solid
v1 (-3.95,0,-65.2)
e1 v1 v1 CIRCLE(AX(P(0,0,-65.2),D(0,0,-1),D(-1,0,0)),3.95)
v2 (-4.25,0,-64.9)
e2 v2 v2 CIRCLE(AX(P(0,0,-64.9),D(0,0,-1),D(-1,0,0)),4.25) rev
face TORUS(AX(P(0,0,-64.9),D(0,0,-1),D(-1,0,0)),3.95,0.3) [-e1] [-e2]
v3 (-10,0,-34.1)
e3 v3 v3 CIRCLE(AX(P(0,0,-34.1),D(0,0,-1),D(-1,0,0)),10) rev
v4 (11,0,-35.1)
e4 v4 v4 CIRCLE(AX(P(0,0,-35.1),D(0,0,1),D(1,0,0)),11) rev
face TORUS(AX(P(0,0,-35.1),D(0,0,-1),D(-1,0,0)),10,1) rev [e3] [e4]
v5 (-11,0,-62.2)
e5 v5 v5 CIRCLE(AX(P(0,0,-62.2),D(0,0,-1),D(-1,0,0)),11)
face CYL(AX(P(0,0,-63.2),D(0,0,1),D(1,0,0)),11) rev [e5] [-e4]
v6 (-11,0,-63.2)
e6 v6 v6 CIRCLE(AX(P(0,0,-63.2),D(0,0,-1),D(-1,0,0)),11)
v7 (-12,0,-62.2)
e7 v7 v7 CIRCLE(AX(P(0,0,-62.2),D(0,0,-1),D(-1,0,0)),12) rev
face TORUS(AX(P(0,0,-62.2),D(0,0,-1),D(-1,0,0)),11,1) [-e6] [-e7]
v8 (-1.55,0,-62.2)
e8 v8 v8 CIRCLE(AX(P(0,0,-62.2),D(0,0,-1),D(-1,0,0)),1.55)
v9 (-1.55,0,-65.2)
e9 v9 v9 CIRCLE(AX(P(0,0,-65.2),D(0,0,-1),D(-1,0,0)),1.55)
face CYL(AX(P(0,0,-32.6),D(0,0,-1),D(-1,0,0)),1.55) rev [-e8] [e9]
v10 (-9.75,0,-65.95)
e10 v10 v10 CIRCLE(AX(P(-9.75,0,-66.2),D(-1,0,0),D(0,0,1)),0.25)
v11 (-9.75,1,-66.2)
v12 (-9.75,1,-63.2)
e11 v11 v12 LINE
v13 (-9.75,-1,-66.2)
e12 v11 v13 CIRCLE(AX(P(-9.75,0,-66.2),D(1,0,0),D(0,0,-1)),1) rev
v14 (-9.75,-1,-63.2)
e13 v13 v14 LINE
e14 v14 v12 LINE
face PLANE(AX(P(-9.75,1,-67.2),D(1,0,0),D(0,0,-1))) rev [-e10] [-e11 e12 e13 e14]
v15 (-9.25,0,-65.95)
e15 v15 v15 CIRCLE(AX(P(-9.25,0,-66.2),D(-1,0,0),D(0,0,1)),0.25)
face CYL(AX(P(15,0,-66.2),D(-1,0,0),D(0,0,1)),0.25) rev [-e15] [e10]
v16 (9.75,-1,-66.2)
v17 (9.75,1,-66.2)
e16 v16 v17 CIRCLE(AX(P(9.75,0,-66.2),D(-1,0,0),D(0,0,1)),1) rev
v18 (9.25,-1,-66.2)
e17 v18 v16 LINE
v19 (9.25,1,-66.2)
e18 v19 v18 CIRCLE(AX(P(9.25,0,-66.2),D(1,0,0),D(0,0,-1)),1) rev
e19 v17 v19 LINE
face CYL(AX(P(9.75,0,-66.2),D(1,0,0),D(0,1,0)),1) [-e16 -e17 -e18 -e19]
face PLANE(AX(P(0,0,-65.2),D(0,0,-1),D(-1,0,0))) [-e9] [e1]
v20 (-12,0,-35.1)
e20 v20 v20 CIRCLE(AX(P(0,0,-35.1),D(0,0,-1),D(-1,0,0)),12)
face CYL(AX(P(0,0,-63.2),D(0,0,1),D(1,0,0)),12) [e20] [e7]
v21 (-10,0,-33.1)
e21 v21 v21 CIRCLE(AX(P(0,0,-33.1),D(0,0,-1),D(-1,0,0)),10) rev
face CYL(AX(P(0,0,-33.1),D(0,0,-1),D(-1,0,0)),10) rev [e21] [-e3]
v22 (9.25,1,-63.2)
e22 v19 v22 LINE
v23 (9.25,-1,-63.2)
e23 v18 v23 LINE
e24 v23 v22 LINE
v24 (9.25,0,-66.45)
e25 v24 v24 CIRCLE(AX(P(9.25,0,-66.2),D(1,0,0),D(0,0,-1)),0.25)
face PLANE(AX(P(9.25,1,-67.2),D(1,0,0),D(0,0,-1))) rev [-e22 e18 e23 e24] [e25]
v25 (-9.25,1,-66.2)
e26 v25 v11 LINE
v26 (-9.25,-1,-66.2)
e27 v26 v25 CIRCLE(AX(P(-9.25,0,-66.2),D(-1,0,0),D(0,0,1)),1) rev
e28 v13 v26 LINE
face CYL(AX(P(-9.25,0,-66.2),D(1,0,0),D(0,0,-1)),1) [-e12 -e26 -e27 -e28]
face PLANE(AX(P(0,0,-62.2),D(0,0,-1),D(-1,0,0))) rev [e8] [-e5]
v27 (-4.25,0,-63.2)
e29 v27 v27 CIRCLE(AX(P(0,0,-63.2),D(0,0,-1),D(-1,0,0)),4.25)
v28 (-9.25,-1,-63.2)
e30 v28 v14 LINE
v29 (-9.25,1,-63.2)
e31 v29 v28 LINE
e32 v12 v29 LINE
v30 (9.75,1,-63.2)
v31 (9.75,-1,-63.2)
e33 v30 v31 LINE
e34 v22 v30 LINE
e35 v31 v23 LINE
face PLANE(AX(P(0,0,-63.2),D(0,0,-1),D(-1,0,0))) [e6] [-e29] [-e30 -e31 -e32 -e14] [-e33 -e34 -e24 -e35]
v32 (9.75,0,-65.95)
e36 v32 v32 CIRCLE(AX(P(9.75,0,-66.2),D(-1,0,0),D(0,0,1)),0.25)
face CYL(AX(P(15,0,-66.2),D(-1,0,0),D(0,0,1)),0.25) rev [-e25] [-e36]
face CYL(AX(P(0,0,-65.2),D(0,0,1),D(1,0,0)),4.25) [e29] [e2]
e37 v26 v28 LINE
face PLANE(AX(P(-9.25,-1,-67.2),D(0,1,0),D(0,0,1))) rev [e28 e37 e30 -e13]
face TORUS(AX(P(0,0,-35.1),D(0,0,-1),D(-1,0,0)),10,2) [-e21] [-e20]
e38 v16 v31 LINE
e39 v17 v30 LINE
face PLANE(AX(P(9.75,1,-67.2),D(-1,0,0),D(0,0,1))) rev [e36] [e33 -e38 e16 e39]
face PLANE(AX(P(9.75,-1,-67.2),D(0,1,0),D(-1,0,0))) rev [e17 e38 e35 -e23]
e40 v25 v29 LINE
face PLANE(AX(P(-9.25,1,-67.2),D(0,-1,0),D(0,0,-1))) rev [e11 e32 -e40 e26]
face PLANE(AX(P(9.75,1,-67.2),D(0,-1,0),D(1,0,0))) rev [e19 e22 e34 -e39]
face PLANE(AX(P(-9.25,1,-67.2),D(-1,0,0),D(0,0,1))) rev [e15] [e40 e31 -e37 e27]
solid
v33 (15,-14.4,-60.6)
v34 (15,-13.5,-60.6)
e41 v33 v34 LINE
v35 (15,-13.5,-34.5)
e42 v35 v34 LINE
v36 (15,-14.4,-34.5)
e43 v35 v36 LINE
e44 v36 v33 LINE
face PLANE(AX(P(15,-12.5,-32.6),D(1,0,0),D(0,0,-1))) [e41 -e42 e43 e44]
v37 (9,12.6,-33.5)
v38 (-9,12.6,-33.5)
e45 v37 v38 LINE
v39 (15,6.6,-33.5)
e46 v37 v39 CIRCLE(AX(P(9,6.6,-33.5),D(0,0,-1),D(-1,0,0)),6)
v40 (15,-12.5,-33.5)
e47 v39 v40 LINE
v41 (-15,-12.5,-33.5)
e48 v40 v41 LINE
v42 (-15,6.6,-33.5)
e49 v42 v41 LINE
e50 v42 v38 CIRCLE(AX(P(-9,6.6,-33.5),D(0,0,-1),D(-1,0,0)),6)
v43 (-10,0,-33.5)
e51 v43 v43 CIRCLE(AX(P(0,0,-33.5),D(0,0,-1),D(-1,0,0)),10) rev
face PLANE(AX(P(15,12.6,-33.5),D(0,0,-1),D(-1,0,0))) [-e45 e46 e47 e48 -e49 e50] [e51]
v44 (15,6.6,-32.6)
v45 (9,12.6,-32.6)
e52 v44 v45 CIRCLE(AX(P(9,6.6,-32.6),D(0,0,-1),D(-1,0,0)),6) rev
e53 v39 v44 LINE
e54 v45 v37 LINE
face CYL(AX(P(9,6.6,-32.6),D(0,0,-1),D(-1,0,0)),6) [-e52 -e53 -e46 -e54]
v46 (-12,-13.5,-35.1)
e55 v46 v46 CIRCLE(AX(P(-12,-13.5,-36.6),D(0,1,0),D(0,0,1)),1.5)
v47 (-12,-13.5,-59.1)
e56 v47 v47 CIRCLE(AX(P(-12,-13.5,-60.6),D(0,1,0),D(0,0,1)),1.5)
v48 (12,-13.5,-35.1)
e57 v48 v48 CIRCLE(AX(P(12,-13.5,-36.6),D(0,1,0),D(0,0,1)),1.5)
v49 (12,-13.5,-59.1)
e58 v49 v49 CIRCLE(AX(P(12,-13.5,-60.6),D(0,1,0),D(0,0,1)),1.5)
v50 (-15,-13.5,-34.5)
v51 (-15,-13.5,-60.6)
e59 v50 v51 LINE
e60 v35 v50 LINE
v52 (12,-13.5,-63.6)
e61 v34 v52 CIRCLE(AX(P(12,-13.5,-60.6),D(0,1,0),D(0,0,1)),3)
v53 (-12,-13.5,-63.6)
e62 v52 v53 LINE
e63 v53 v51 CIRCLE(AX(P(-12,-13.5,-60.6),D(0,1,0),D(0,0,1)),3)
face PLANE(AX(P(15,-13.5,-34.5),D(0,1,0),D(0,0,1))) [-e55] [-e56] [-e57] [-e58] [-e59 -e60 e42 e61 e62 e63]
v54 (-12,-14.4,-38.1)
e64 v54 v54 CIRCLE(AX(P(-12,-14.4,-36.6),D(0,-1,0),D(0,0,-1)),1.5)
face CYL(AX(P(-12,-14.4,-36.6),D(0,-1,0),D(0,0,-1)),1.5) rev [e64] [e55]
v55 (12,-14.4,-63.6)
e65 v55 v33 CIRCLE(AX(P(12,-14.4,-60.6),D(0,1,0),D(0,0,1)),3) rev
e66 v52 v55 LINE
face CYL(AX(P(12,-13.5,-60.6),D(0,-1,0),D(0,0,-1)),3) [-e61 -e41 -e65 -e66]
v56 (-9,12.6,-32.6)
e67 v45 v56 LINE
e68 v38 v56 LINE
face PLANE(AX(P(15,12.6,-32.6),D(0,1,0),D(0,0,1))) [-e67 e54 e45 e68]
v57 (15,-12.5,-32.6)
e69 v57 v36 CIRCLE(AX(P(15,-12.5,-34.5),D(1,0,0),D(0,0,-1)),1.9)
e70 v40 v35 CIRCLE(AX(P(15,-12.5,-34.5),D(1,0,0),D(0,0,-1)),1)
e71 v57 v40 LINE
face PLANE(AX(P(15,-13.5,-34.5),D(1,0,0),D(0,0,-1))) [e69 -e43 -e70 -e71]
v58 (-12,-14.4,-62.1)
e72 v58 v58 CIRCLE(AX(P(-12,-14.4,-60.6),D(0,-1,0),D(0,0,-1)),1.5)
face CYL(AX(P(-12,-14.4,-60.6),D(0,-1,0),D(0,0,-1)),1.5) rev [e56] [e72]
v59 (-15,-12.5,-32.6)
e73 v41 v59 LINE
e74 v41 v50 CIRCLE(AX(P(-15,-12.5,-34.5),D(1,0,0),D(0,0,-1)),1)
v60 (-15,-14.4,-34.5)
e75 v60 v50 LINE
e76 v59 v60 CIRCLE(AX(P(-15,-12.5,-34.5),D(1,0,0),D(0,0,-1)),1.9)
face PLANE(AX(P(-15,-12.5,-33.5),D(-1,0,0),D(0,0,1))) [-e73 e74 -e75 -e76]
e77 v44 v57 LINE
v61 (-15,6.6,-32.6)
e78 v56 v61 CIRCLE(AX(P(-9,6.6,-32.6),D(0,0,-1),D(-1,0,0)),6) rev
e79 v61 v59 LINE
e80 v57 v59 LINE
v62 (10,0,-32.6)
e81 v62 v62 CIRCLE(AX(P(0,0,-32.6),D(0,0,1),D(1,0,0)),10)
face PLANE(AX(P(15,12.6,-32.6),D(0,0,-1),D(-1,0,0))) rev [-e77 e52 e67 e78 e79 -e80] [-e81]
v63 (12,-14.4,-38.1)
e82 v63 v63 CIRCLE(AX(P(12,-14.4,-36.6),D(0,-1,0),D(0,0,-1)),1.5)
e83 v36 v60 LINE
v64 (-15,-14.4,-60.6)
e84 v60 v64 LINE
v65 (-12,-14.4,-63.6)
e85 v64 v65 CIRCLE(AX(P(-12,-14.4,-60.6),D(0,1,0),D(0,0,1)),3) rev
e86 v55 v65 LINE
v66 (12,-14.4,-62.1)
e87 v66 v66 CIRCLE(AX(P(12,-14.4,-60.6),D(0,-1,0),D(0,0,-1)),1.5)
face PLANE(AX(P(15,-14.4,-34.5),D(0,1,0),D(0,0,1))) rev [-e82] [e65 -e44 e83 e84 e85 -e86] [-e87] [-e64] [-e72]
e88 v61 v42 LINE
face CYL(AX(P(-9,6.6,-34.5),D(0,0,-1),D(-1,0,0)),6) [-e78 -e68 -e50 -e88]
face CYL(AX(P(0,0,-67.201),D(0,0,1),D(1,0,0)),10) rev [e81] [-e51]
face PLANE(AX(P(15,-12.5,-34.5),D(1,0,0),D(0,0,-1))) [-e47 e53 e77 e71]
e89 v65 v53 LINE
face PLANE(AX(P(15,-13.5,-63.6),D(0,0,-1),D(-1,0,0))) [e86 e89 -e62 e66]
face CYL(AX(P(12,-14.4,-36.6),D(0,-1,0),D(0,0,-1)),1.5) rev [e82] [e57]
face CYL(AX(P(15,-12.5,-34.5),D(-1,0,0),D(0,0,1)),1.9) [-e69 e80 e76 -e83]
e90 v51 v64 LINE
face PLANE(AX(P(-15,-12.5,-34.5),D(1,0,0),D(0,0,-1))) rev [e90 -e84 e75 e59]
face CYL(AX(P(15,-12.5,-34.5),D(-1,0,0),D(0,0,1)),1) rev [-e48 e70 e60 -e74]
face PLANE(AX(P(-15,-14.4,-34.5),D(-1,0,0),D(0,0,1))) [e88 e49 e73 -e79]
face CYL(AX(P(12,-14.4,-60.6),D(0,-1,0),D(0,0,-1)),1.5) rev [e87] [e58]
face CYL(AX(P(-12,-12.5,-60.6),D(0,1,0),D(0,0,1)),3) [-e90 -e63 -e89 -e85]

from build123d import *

# Parameters (mm, degrees)
SKETCH6_R                         = 12
EXTRUDE5_DEPTH                    = 30.1
FILLET1_R                         = 2
FILLET3_R                         = 1
BASE_FLANGE2_DEPTH                = 15
SKETCH10_R                        = 4.25
EXTRUDE8_DEPTH                    = 2
FILLET4_R                         = 0.3
SKETCH15_W                        = 1.5
SKETCH15_H                        = 0.9
F_3_0_3_DIAMETER_HOLE1_AT_2_COUNT = 2
F_3_0_3_DIAMETER_HOLE1_AT_2_PITCH = 33.941125497
F_3_0_3_DIAMETER_HOLE1_AT_3_COUNT = 2
F_3_0_3_DIAMETER_HOLE1_AT_3_PITCH = 24
F_3_0_3_DIAMETER_HOLE1_AT_4_COUNT = 2
F_3_0_3_DIAMETER_HOLE1_AT_4_PITCH = 24
FILLET6_R                         = 6
FILLET7_R                         = 3
SKETCH16_W                        = 0.5
SKETCH16_H                        = 2
EXTRUDE10_DEPTH                   = 4
FILLET8_RADIUS                    = 1
FILLET8_LENGTH                    = 0.5
FILLET9_RADIUS                    = 1
FILLET9_LENGTH                    = 0.5
SKETCH17_R                        = 0.25
EXTRUDE11_DEPTH                   = 74.046303808
SKETCH19_R                        = 1.55
EXTRUDE13_DEPTH                   = 39.666781609
SKETCH21_R                        = 10
EXTRUDE14_DEPTH                   = 0.9


# Read off the part's stored shape, not the designer's step: Shell4
# Sheet-metal steps are written as plain solids
with BuildPart() as part:
    # Sketch6 → Extrude5 (new body)
    with BuildSketch(Plane(origin=(0, 0, -33.1), x_dir=(-1, 0, 0), z_dir=(0, 0, -1))):
        Circle(SKETCH6_R)
    extrude(amount=EXTRUDE5_DEPTH)

    # Fillet1
    fillet1_edges = [part.edges().sort_by_distance(p)[0] for p in [
        (12, 0, -33.1),
    ]]
    fillet(fillet1_edges, radius=FILLET1_R)

    # Fillet3
    fillet3_edges = [part.edges().sort_by_distance(p)[0] for p in [
        (12, 0, -63.2),
    ]]
    fillet(fillet3_edges, radius=FILLET3_R)

    # Shell4 outline → Shell4 (revolve, cut)
    with BuildSketch(Plane.XZ):
        with BuildLine():
            Line((10, -34.1), (10, -33.1))
            Line((10, -33.1), (0, -33.1))
            Line((0, -33.1), (0, -62.2))
            Line((0, -62.2), (11, -62.2))
            Line((11, -62.2), (11, -35.1))
            ThreePointArc((11, -35.1), (10.707106781, -34.392893219), (10, -34.1))
        make_face()
    revolve(axis=Axis((0, 0, 0), (0, 0, 1)), mode=Mode.SUBTRACT)

    # Sketch10 → Extrude8 (add)
    with BuildSketch(Plane(origin=(0, 0, -63.2), x_dir=(-1, 0, 0), z_dir=(0, 0, -1))):
        Circle(SKETCH10_R)
    extrude(amount=EXTRUDE8_DEPTH)

    # Fillet4
    fillet4_edges = [part.edges().sort_by_distance(p)[0] for p in [
        (4.25, 0, -65.2),
    ]]
    fillet(fillet4_edges, radius=FILLET4_R)

    # Sketch16 → Extrude10 (add)
    with BuildSketch(Plane(origin=(0, 0, -63.2), x_dir=(-1, 0, 0), z_dir=(0, 0, -1))):
        with Locations((-9.5, 0)):
            Rectangle(SKETCH16_W, SKETCH16_H)
        with Locations((9.5, 0)):
            Rectangle(SKETCH16_W, SKETCH16_H)
    extrude(amount=EXTRUDE10_DEPTH)

    # Fillet8: full round fillet: the end face becomes a half cylinder, R = half its width
    fillet8_face = Plane((9.5, 0, -67.2), x_dir=(-1, 0, 0), z_dir=(0, 0, -1))  # on the end face: x along it, z out of the body
    fillet8_slab = fillet8_face.offset(-FILLET8_RADIUS / 2) * Box(FILLET8_LENGTH, 2 * FILLET8_RADIUS, FILLET8_RADIUS, mode=Mode.PRIVATE)  # the body's end, R deep
    fillet8_round = Plane((9.5, 0, -66.2), x_dir=(0, 0, -1), z_dir=(-1, 0, 0)) * Cylinder(FILLET8_RADIUS, FILLET8_LENGTH, mode=Mode.PRIVATE)  # its axis R under the face
    add(fillet8_slab - fillet8_round, mode=Mode.SUBTRACT)

    # Fillet9: full round fillet: the end face becomes a half cylinder, R = half its width
    fillet9_face = Plane((-9.5, 0, -67.2), x_dir=(-1, 0, 0), z_dir=(0, 0, -1))  # on the end face: x along it, z out of the body
    fillet9_slab = fillet9_face.offset(-FILLET9_RADIUS / 2) * Box(FILLET9_LENGTH, 2 * FILLET9_RADIUS, FILLET9_RADIUS, mode=Mode.PRIVATE)  # the body's end, R deep
    fillet9_round = Plane((-9.5, 0, -66.2), x_dir=(0, 0, -1), z_dir=(-1, 0, 0)) * Cylinder(FILLET9_RADIUS, FILLET9_LENGTH, mode=Mode.PRIVATE)  # its axis R under the face
    add(fillet9_slab - fillet9_round, mode=Mode.SUBTRACT)

    # Sketch17 → Extrude11 (cut, through all)
    with BuildSketch(Plane.ZY.offset(9.75)):
        with Locations((-66.2, 0)):
            Circle(SKETCH17_R)
    extrude(amount=-EXTRUDE11_DEPTH, mode=Mode.SUBTRACT)


with BuildPart() as body_2:
    # Sketch4 → Base-Flange2 (new, symmetric)
    with BuildSketch(Plane(origin=(0, 0, 0), x_dir=(0, 0, -1), z_dir=(1, 0, 0))):
        with BuildLine():
            Line((33.5, 12.6), (33.5, -12.5))
            ThreePointArc((33.5, -12.5), (33.792893219, -13.207106781), (34.5, -13.5))
            Line((34.5, -13.5), (63.6, -13.5))
            Line((63.6, -13.5), (63.6, -14.4))
            Line((63.6, -14.4), (34.5, -14.4))
            ThreePointArc((34.5, -14.4), (33.156497116, -13.843502884), (32.6, -12.5))
            Line((32.6, -12.5), (32.6, 12.6))
            Line((32.6, 12.6), (33.5, 12.6))
        make_face()
    extrude(amount=BASE_FLANGE2_DEPTH, both=True)

    # Sketch15 → Ø3.0 (3) Diameter Hole1 (revolve, cut)
    with BuildSketch(Plane(origin=(12, -14.4, -60.6), x_dir=(0, 0, -1), z_dir=(1, 0, 0))):
        with Locations((0.75, 0.45)):
            Rectangle(SKETCH15_W, SKETCH15_H)
    f_3_0_3_diameter_hole1 = revolve(axis=Axis((12, -20.75, -60.6), (0, 1, 0)), mode=Mode.SUBTRACT)

    # Ø3.0 (3) Diameter Hole1 at 2: Ø3.0 (3) Diameter Hole1 ×2
    with Locations(*[Vector(-0.7071067811865476, 0, 0.7071067811865476) * (i * F_3_0_3_DIAMETER_HOLE1_AT_2_PITCH) for i in range(1, F_3_0_3_DIAMETER_HOLE1_AT_2_COUNT)]):
        add(f_3_0_3_diameter_hole1, mode=Mode.SUBTRACT)

    # Ø3.0 (3) Diameter Hole1 at 3: Ø3.0 (3) Diameter Hole1 ×2
    with Locations(*[(0, 0, i * F_3_0_3_DIAMETER_HOLE1_AT_3_PITCH) for i in range(1, F_3_0_3_DIAMETER_HOLE1_AT_3_COUNT)]):
        add(f_3_0_3_diameter_hole1, mode=Mode.SUBTRACT)

    # Ø3.0 (3) Diameter Hole1 at 4: Ø3.0 (3) Diameter Hole1 ×2
    with Locations(*[(-i * F_3_0_3_DIAMETER_HOLE1_AT_4_PITCH, 0, 0) for i in range(1, F_3_0_3_DIAMETER_HOLE1_AT_4_COUNT)]):
        add(f_3_0_3_diameter_hole1, mode=Mode.SUBTRACT)

    # Fillet6
    fillet6_edges = [body_2.edges().sort_by_distance(p)[0] for p in [
        (15, 12.6, -33.05),
        (-15, 12.6, -33.05),
    ]]
    fillet(fillet6_edges, radius=FILLET6_R)

    # Fillet7
    fillet7_edges = [body_2.edges().sort_by_distance(p)[0] for p in [
        (15, -13.95, -63.6),
        (-15, -13.95, -63.6),
    ]]
    fillet(fillet7_edges, radius=FILLET7_R)


with BuildPart() as extrude13_tool:
    # Sketch19 → Extrude13 (new, through all)
    with BuildSketch(Plane(origin=(0, 0, -65.2), x_dir=(-1, 0, 0), z_dir=(0, 0, -1))):
        Circle(SKETCH19_R)
    extrude(amount=-EXTRUDE13_DEPTH)


with BuildPart() as part_1:
    add(part.part)

    # Extrude13: cut by extrude13_tool
    add(extrude13_tool.part, mode=Mode.SUBTRACT)


with BuildPart() as body_2_1:
    add(body_2.part)

    # Extrude13: cut by extrude13_tool
    add(extrude13_tool.part, mode=Mode.SUBTRACT)

    # Sketch21 → Extrude14 (cut)
    with BuildSketch(Plane.XY.offset(-32.6)):
        Circle(SKETCH21_R)
    extrude(amount=-EXTRUDE14_DEPTH, mode=Mode.SUBTRACT)


solid = Compound([part_1.part, body_2_1.part])
